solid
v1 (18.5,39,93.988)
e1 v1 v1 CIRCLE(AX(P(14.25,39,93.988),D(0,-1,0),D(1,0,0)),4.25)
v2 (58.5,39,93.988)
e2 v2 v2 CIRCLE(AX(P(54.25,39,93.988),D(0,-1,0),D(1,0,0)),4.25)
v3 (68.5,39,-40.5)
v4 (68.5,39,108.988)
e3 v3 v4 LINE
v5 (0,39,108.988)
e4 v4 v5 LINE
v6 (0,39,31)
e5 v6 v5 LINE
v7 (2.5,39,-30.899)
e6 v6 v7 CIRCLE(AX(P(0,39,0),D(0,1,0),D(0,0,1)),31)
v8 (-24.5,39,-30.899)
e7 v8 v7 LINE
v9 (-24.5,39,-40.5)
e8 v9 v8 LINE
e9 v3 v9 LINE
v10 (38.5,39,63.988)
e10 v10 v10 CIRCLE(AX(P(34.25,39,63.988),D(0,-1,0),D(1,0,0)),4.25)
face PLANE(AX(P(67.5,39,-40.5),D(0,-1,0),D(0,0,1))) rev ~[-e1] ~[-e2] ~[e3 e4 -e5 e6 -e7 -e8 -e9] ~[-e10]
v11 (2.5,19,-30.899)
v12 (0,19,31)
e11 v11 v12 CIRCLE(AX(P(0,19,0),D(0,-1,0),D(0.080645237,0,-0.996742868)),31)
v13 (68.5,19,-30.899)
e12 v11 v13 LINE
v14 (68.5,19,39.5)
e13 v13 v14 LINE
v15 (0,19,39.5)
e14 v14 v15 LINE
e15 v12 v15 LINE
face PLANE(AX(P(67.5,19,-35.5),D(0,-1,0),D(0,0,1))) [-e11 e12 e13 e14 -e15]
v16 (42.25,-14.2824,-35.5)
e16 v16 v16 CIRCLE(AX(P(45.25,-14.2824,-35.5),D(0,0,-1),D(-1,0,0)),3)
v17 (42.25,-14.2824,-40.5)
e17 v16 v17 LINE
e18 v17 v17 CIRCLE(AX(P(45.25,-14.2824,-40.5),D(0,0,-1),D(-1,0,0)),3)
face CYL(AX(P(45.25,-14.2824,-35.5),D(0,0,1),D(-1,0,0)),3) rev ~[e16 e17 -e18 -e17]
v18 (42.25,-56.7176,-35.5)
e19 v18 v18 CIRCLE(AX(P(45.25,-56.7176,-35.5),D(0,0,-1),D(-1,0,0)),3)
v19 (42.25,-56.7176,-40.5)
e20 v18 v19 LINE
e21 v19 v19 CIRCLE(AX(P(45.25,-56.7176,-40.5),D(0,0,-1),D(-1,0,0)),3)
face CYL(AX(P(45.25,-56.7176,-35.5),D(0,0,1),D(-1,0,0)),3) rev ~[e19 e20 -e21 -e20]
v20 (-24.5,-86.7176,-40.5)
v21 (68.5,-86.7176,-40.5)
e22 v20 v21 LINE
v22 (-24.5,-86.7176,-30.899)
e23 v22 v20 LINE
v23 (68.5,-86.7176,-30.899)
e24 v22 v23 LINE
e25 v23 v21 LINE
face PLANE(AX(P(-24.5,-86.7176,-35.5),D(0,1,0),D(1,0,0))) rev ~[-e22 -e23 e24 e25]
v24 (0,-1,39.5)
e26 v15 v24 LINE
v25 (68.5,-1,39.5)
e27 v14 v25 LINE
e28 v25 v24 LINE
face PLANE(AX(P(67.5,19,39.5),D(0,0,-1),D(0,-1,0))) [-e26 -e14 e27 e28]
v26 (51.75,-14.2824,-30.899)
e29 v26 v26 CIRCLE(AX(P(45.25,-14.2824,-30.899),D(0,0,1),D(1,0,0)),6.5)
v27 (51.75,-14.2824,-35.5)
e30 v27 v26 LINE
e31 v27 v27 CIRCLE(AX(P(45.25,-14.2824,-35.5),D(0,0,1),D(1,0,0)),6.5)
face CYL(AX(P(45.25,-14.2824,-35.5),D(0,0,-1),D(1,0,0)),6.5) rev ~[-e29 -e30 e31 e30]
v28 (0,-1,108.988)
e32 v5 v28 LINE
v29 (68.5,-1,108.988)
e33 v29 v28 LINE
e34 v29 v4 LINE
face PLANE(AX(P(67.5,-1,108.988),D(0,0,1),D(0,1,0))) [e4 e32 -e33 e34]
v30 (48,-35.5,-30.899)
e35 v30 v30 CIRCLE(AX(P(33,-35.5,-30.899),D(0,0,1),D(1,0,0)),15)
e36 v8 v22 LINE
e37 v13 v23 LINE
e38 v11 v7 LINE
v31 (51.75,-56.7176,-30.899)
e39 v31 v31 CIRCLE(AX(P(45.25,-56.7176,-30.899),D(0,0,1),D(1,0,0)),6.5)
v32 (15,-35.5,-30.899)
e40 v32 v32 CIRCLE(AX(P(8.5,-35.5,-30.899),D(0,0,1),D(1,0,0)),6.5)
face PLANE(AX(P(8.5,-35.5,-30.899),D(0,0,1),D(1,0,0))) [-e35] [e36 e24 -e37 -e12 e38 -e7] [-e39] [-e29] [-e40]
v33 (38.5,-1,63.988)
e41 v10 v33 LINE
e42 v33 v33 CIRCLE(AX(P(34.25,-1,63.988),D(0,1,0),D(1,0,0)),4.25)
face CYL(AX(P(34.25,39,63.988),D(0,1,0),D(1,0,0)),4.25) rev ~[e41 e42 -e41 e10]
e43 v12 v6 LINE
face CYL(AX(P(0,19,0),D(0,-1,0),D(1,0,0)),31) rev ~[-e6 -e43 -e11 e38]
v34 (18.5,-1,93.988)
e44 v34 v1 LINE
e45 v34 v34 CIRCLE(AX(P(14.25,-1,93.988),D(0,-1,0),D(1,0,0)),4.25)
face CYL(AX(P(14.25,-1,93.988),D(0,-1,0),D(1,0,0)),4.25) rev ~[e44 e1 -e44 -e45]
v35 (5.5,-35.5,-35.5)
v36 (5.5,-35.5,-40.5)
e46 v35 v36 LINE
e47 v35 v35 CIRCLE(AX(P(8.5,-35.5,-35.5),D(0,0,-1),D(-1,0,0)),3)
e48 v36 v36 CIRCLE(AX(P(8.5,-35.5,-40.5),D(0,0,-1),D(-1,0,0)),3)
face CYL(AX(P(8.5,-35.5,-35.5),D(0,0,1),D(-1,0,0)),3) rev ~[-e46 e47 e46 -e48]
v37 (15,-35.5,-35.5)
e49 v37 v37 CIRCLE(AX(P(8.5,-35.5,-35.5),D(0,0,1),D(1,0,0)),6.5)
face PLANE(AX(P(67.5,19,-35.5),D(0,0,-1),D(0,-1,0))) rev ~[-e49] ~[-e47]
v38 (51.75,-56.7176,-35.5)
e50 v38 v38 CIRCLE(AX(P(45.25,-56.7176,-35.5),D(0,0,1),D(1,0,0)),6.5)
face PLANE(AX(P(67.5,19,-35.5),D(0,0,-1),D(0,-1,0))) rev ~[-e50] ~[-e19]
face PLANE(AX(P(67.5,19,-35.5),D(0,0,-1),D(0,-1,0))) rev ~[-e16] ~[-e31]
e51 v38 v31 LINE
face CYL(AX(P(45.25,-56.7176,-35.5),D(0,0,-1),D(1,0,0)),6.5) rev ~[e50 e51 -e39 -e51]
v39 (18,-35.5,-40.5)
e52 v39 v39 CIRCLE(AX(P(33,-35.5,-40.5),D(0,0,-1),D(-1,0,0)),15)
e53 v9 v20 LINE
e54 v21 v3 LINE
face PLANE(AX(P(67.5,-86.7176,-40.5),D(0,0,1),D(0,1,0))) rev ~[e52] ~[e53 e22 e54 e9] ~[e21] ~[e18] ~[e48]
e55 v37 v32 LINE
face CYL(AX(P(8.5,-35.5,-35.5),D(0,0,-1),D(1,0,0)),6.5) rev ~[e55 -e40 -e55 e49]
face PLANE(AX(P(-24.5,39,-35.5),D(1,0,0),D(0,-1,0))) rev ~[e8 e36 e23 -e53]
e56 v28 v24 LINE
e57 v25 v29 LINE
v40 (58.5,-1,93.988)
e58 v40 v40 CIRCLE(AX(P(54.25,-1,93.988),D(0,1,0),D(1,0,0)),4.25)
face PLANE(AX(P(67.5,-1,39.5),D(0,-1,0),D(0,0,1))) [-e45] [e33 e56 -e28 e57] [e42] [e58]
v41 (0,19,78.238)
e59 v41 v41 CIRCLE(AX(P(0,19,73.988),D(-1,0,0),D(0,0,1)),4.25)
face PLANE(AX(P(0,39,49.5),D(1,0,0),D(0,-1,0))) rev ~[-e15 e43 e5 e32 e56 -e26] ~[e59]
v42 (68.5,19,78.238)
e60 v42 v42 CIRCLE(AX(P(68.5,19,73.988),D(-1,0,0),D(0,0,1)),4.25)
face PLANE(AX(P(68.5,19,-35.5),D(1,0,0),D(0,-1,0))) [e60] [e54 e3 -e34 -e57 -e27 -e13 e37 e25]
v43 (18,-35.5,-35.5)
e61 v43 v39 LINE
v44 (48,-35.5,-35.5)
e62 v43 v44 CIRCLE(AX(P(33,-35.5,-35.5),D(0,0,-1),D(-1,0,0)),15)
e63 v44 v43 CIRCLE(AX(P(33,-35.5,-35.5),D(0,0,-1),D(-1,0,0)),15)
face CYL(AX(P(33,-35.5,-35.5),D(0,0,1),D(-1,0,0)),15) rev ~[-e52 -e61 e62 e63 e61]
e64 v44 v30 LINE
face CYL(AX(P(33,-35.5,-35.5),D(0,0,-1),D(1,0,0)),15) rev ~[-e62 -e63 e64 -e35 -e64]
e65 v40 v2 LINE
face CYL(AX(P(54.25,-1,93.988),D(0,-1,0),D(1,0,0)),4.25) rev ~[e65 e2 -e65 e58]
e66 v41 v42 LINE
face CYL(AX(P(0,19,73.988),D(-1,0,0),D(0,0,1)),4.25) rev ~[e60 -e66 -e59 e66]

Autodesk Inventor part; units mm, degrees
ref_plane "YZ Plane" through (0, 0, 0) normal (1, 0, 0) x (0, 1, 0)
ref_plane "XZ Plane" through (0, 0, 0) normal (0, 1, 0) x (-1, 0, 0)
ref_plane "Work Plane1" through (8.5, -35.5, -35.5) normal (0, 0, -1) x (-1, 0, 0)
sketch "Sketch1" plane through (8.5, -35.5, -35.5) normal (0, 0, -1) x (-1, 0, 0)
  circle A0 centre (0, 0) radius 3 projected
  circle A1 centre (0, 0) radius 6 projected
  circle A2 centre (-36.75, -21.2176) radius 3 projected
  circle A3 centre (-36.75, -21.2176) radius 6 projected
  circle A4 centre (-36.75, 21.2176) radius 6 projected
  circle A5 centre (-36.75, 21.2176) radius 3 projected
  line L0 (-36.75, -46.2176) -> (28, -46.2176)
  line L1 (28, -46.2176) -> (28, 0)
  line L2 (-36.75, -46.2176) -> (-59, -46.2176)
  line L3 (-59, -46.2176) -> (-59, 34.5)
  line L4 (-59, 34.5) -> (28, 34.5)
  line L5 (34.5, 35.5) -> (-17.5, 35.5) projected
  line L6 (28, 34.5) -> (28, 0)
  circle A6 centre (-24.5, 0) radius 11 projected
  circle A7 centre (-24.5, 0) radius 15
  point P0 (8.5, 35.5)
  dimension "d3" = 30
extrude "Extrusion1" add sketch "Sketch1" along normal blind 5 contours A1 | A3 | A4 | L2 L3 L4 L6 L1 L0
sketch "Sketch2" plane through (-19.5, -81.7176, -35.5) normal (-1, 0, 0) x (0, 0, 1)
  line L0 (0, 0) -> (0, 80.7176) projected
  line L1 (0, 80.7176) -> (-5, 80.7176) projected
  line L2 (-5, 0) -> (-5, 80.7176) projected
  line L3 (0, 0) -> (-5, 0) projected
  point P0 (35.5, 81.7176)
extrude "Extrusion2" add sketch "Sketch2" along normal blind 5
sketch "Sketch3" plane through (67.5, -81.7176, -40.5) normal (0, -1, 0) x (1, 0, 0)
  line L0 (0, 5) -> (-92, 5) projected
  line L1 (-92, 0) -> (-92, 5) projected
  line L2 (0, 0) -> (-92, 0) projected
  line L3 (0, 5) -> (0, 0) projected
  point P0 (-67.5, 40.5)
extrude "Extrusion3" add sketch "Sketch3" along normal blind 5
sketch "Sketch4" plane through (8.5, -35.5, -35.5) normal (0, 0, 1) x (1, 0, 0)
  line L0 (-28, -46.2176) -> (-28, 34.5)
  line L1 (-28, -46.2176) -> (59, -46.2176)
  line L2 (59, -51.2176) -> (-33, -51.2176) projected
  line L3 (-33, 34.5) -> (-33, -51.2176) projected
  line L4 (59, 34.5) -> (59, -51.2176) projected
  line L5 (59, 34.5) -> (-33, 34.5) projected
  line L6 (-28, -46.2176) -> (-33, -46.2176)
  line L7 (-33, 34.5) -> (-33, -51.2176) projected
extrude "Extrusion4" add sketch "Sketch4" along normal blind 75 contours L1 L4 L2 L3 L6
sketch "Sketch5" plane through (67.5, -86.7176, -40.5) normal (0, -1, 0) x (1, 0, 0)
  line L0 (-92, 5) -> (-92, 80) projected
  line L1 (-92, 80) -> (-77.75, 80)
  line L2 (-92, 80) -> (0, 80) projected
  line L3 (-77.75, 80) -> (-37.75, 80)
  line L4 (-37.75, 80) -> (-37.75, 65)
  line L5 (-37.75, 65) -> (-77.75, 65)
  circle A0 centre (-77.75, 65) radius 4.25
  circle A1 centre (-37.75, 65) radius 4.25
  point P0 (-67.5, 40.5)
  dimension "d14" = 14.25
  dimension "d15" = 40
  dimension "d16" = 15
  dimension "d17" = 8.5
  dimension "d18" = 8.5
extrude "Extrusion5" cut sketch "Sketch5" against normal through all
sketch "Sketch6" plane through (67.5, -1, -35.5) normal (0, 1, 0) x (1, 0, 0)
  line L0 (0, 0) -> (-92, 0) projected
  line L1 (0, 0) -> (0, 5) projected
  line L2 (0, 5) -> (-92, 5) projected
  line L3 (-92, 0) -> (-92, 5) projected
  point P0 (-67.5, -35.5)
extrude "Extrusion6" add sketch "Sketch6" along normal blind 20
sketch "Sketch7" plane through (67.5, 19, -35.5) normal (0, 1, 0) x (1, 0, 0)
  circle A0 centre (-67.5, -35.5) radius 31 projected
  circle A1 centre (-67.5, -35.5) radius 31 projected
  circle A2 centre (-67.5, -35.5) radius 31 projected
  line L0 (-67.5, -66.5) -> (-67.5, -75)
  line L1 (0, -75) -> (-92, -75) projected
  line L2 (0, 5) -> (0, -75) projected
  line L3 (-67.5, -75) -> (0, -75)
  line L4 (0, -75) -> (0, 5)
  line L5 (-65, -20.5) -> (-65, 0) projected
  line L6 (-65, -4.601) -> (-65, 0)
  line L7 (-92, 5) -> (-92, 0) projected
  line L8 (-92, 0) -> (0, 0) projected
  line L9 (0, 0) -> (0, 5) projected
  line L10 (0, 5) -> (-92, 5) projected
  point P0 (-65, -4.601)
extrude "Extrusion7" add sketch "Sketch7" along normal blind 20 contours A0 L5 L8 L2 L1 L0 | L8 L7 L10 L2
sketch "Sketch10" plane through (8.5, -35.5, 39.5) normal (0, 0, 1) x (1, 0, 0)
  line L0 (59, -51.2176) -> (59, -46.2176) projected
  line L1 (59, -46.2176) -> (-33, -46.2176) projected
  line L2 (-33, -46.2176) -> (-33, -51.2176) projected
  line L3 (-33, -51.2176) -> (59, -51.2176) projected
  point P0 (-8.5, 35.5)
extrude "Extrusion10" cut sketch "Sketch10" against normal up to surface (75 mm away)
sketch "Sketch11" plane through (0, 19, 39.5) normal (0, 0, 1) x (1, 0, 0)
  line L0 (0, 0) -> (67.5, 0) projected
  line L1 (67.5, 0) -> (67.5, 20) projected
  line L2 (0, 20) -> (67.5, 20) projected
  line L3 (0, 0) -> (0, 20) projected
  point P0 (0, -19)
extrude "Extrusion11" add sketch "Sketch11" along normal blind 10
sketch "Sketch12" plane through (67.5, 19, -35.5) normal (0, -1, 0) x (1, 0, 0)
  line L0 (-67.5, 66.5) -> (-67.5, 85) projected
  line L1 (-67.5, 85) -> (0, 85) projected
  line L2 (-67.5, 85) -> (0, 85)
  line L3 (0, 85) -> (0, 75)
  line L4 (0, 0) -> (0, 85) projected
  line L5 (0, 75) -> (-67.5, 75)
  line L6 (-67.5, 75) -> (-67.5, 85)
  point P0 (-67.5, 35.5)
  dimension "d35" = 10
extrude "Extrusion12" add sketch "Sketch12" along normal blind 20
sketch "Sketch13" plane through (0, 19, 49.5) normal (0, 0, 1) x (1, 0, 0)
  line L0 (67.5, 20) -> (67.5, -20) projected
  line L1 (67.5, 20) -> (0, 20) projected
  line L2 (0, 20) -> (0, -20) projected
  line L3 (67.5, -20) -> (0, -20) projected
  point P0 (0, -19)
extrude "Extrusion13" add sketch "Sketch13" along normal blind 59.488
sketch "Sketch14" plane through (67.5, -1, -35.5) normal (0, -1, 0) x (1, 0, 0)
  line L0 (-53.25, 129.488) -> (-13.25, 129.488)
  circle A0 centre (-53.25, 129.488) radius 4.25
  circle A1 centre (-13.25, 129.488) radius 4.25
  point P0 (-67.5, 35.5)
  point P1 (-67.5, 144.488)
  dimension "d43" = 40
  dimension "d44" = 8.5
  dimension "d45" = 8.5
extrude "Extrusion14" cut sketch "Sketch14" against normal up to surface (40 mm away)
sketch "Sketch15" plane through (67.5, -86.7176, -40.5) normal (1, 0, 0) x (0, 0, -1)
  line L0 (-5, 105.7176) -> (-5, 0) projected
  line L1 (0, 0) -> (-5, 0) projected
  line L2 (0, 0) -> (0, 125.7176) projected
  line L3 (0, 125.7176) -> (-149.488, 125.7176) projected
  line L4 (-149.488, 85.7176) -> (-149.488, 125.7176) projected
  line L5 (-80, 85.7176) -> (-149.488, 85.7176) projected
  line L6 (-80, 105.7176) -> (-80, 85.7176) projected
  line L7 (-5, 105.7176) -> (-80, 105.7176) projected
  point P0 (-40.5, 86.7176)
extrude "Extrusion15" add sketch "Sketch15" along normal blind 1
sketch "Sketch16" plane through (0, 19, 31) normal (-1, 0, 0) x (0, 0, 1)
  line L0 (77.988, 20) -> (77.988, -20) projected
  line L1 (77.988, 0) -> (42.988, 0)
  circle A0 centre (42.988, 0) radius 4.25
  point P0 (-31, -19)
  dimension "d50" = 35
  dimension "d51" = 8.5
extrude "Extrusion16" cut sketch "Sketch16" against normal up to surface (68.5 mm away)
sketch "Sketch17" plane through (67.5, 39, -35.5) normal (0, 1, 0) x (1, 0, 0)
  circle A0 centre (-53.25, -129.488) radius 4.25 projected
  line L0 (-53.25, -129.488) -> (-33.25, -129.488)
  line L1 (-33.25, -129.488) -> (-33.25, -99.488)
  circle A1 centre (-33.25, -99.488) radius 4.25
  point P0 (-67.5, -35.5)
  dimension "d54" = 20
  dimension "d55" = 30
  dimension "d56" = 8.5
extrude "Extrusion17" cut sketch "Sketch17" against normal up to surface (40 mm away) contours A1
sketch "Sketch18" plane through (8.5, -35.5, -35.5) normal (0, 0, 1) x (1, 0, 0)
  line L0 (-6, 54.5) -> (60, 54.5) projected
  line L1 (-6, 54.5) -> (-6, 74.5) projected
  line L2 (-33, 74.5) -> (-6, 74.5) projected
  line L3 (-33, 74.5) -> (-33, -51.2176) projected
  line L4 (-33, -51.2176) -> (60, -51.2176) projected
  line L5 (60, 54.5) -> (60, -51.2176) projected
  circle A0 centre (0, 0) radius 3 projected
  circle A1 centre (36.75, -21.2176) radius 3 projected
  circle A2 centre (36.75, 21.2176) radius 3 projected
  circle A3 centre (24.5, 0) radius 15 projected
  circle A4 centre (36.75, 21.2176) radius 6.5
  circle A5 centre (36.75, -21.2176) radius 6.5
  circle A6 centre (0, 0) radius 3 projected
  circle A7 centre (0, 0) radius 6.5
  point P0 (-8.5, 35.5)
  dimension "d59" = 13
  dimension "d60" = 13
  dimension "d61" = 13
extrude "Extrusion18" add sketch "Sketch18" along normal up to surface (4.601 mm away) contours L0 L5 L4 L3 L2 L1
properties part number "motor_connector_left"
